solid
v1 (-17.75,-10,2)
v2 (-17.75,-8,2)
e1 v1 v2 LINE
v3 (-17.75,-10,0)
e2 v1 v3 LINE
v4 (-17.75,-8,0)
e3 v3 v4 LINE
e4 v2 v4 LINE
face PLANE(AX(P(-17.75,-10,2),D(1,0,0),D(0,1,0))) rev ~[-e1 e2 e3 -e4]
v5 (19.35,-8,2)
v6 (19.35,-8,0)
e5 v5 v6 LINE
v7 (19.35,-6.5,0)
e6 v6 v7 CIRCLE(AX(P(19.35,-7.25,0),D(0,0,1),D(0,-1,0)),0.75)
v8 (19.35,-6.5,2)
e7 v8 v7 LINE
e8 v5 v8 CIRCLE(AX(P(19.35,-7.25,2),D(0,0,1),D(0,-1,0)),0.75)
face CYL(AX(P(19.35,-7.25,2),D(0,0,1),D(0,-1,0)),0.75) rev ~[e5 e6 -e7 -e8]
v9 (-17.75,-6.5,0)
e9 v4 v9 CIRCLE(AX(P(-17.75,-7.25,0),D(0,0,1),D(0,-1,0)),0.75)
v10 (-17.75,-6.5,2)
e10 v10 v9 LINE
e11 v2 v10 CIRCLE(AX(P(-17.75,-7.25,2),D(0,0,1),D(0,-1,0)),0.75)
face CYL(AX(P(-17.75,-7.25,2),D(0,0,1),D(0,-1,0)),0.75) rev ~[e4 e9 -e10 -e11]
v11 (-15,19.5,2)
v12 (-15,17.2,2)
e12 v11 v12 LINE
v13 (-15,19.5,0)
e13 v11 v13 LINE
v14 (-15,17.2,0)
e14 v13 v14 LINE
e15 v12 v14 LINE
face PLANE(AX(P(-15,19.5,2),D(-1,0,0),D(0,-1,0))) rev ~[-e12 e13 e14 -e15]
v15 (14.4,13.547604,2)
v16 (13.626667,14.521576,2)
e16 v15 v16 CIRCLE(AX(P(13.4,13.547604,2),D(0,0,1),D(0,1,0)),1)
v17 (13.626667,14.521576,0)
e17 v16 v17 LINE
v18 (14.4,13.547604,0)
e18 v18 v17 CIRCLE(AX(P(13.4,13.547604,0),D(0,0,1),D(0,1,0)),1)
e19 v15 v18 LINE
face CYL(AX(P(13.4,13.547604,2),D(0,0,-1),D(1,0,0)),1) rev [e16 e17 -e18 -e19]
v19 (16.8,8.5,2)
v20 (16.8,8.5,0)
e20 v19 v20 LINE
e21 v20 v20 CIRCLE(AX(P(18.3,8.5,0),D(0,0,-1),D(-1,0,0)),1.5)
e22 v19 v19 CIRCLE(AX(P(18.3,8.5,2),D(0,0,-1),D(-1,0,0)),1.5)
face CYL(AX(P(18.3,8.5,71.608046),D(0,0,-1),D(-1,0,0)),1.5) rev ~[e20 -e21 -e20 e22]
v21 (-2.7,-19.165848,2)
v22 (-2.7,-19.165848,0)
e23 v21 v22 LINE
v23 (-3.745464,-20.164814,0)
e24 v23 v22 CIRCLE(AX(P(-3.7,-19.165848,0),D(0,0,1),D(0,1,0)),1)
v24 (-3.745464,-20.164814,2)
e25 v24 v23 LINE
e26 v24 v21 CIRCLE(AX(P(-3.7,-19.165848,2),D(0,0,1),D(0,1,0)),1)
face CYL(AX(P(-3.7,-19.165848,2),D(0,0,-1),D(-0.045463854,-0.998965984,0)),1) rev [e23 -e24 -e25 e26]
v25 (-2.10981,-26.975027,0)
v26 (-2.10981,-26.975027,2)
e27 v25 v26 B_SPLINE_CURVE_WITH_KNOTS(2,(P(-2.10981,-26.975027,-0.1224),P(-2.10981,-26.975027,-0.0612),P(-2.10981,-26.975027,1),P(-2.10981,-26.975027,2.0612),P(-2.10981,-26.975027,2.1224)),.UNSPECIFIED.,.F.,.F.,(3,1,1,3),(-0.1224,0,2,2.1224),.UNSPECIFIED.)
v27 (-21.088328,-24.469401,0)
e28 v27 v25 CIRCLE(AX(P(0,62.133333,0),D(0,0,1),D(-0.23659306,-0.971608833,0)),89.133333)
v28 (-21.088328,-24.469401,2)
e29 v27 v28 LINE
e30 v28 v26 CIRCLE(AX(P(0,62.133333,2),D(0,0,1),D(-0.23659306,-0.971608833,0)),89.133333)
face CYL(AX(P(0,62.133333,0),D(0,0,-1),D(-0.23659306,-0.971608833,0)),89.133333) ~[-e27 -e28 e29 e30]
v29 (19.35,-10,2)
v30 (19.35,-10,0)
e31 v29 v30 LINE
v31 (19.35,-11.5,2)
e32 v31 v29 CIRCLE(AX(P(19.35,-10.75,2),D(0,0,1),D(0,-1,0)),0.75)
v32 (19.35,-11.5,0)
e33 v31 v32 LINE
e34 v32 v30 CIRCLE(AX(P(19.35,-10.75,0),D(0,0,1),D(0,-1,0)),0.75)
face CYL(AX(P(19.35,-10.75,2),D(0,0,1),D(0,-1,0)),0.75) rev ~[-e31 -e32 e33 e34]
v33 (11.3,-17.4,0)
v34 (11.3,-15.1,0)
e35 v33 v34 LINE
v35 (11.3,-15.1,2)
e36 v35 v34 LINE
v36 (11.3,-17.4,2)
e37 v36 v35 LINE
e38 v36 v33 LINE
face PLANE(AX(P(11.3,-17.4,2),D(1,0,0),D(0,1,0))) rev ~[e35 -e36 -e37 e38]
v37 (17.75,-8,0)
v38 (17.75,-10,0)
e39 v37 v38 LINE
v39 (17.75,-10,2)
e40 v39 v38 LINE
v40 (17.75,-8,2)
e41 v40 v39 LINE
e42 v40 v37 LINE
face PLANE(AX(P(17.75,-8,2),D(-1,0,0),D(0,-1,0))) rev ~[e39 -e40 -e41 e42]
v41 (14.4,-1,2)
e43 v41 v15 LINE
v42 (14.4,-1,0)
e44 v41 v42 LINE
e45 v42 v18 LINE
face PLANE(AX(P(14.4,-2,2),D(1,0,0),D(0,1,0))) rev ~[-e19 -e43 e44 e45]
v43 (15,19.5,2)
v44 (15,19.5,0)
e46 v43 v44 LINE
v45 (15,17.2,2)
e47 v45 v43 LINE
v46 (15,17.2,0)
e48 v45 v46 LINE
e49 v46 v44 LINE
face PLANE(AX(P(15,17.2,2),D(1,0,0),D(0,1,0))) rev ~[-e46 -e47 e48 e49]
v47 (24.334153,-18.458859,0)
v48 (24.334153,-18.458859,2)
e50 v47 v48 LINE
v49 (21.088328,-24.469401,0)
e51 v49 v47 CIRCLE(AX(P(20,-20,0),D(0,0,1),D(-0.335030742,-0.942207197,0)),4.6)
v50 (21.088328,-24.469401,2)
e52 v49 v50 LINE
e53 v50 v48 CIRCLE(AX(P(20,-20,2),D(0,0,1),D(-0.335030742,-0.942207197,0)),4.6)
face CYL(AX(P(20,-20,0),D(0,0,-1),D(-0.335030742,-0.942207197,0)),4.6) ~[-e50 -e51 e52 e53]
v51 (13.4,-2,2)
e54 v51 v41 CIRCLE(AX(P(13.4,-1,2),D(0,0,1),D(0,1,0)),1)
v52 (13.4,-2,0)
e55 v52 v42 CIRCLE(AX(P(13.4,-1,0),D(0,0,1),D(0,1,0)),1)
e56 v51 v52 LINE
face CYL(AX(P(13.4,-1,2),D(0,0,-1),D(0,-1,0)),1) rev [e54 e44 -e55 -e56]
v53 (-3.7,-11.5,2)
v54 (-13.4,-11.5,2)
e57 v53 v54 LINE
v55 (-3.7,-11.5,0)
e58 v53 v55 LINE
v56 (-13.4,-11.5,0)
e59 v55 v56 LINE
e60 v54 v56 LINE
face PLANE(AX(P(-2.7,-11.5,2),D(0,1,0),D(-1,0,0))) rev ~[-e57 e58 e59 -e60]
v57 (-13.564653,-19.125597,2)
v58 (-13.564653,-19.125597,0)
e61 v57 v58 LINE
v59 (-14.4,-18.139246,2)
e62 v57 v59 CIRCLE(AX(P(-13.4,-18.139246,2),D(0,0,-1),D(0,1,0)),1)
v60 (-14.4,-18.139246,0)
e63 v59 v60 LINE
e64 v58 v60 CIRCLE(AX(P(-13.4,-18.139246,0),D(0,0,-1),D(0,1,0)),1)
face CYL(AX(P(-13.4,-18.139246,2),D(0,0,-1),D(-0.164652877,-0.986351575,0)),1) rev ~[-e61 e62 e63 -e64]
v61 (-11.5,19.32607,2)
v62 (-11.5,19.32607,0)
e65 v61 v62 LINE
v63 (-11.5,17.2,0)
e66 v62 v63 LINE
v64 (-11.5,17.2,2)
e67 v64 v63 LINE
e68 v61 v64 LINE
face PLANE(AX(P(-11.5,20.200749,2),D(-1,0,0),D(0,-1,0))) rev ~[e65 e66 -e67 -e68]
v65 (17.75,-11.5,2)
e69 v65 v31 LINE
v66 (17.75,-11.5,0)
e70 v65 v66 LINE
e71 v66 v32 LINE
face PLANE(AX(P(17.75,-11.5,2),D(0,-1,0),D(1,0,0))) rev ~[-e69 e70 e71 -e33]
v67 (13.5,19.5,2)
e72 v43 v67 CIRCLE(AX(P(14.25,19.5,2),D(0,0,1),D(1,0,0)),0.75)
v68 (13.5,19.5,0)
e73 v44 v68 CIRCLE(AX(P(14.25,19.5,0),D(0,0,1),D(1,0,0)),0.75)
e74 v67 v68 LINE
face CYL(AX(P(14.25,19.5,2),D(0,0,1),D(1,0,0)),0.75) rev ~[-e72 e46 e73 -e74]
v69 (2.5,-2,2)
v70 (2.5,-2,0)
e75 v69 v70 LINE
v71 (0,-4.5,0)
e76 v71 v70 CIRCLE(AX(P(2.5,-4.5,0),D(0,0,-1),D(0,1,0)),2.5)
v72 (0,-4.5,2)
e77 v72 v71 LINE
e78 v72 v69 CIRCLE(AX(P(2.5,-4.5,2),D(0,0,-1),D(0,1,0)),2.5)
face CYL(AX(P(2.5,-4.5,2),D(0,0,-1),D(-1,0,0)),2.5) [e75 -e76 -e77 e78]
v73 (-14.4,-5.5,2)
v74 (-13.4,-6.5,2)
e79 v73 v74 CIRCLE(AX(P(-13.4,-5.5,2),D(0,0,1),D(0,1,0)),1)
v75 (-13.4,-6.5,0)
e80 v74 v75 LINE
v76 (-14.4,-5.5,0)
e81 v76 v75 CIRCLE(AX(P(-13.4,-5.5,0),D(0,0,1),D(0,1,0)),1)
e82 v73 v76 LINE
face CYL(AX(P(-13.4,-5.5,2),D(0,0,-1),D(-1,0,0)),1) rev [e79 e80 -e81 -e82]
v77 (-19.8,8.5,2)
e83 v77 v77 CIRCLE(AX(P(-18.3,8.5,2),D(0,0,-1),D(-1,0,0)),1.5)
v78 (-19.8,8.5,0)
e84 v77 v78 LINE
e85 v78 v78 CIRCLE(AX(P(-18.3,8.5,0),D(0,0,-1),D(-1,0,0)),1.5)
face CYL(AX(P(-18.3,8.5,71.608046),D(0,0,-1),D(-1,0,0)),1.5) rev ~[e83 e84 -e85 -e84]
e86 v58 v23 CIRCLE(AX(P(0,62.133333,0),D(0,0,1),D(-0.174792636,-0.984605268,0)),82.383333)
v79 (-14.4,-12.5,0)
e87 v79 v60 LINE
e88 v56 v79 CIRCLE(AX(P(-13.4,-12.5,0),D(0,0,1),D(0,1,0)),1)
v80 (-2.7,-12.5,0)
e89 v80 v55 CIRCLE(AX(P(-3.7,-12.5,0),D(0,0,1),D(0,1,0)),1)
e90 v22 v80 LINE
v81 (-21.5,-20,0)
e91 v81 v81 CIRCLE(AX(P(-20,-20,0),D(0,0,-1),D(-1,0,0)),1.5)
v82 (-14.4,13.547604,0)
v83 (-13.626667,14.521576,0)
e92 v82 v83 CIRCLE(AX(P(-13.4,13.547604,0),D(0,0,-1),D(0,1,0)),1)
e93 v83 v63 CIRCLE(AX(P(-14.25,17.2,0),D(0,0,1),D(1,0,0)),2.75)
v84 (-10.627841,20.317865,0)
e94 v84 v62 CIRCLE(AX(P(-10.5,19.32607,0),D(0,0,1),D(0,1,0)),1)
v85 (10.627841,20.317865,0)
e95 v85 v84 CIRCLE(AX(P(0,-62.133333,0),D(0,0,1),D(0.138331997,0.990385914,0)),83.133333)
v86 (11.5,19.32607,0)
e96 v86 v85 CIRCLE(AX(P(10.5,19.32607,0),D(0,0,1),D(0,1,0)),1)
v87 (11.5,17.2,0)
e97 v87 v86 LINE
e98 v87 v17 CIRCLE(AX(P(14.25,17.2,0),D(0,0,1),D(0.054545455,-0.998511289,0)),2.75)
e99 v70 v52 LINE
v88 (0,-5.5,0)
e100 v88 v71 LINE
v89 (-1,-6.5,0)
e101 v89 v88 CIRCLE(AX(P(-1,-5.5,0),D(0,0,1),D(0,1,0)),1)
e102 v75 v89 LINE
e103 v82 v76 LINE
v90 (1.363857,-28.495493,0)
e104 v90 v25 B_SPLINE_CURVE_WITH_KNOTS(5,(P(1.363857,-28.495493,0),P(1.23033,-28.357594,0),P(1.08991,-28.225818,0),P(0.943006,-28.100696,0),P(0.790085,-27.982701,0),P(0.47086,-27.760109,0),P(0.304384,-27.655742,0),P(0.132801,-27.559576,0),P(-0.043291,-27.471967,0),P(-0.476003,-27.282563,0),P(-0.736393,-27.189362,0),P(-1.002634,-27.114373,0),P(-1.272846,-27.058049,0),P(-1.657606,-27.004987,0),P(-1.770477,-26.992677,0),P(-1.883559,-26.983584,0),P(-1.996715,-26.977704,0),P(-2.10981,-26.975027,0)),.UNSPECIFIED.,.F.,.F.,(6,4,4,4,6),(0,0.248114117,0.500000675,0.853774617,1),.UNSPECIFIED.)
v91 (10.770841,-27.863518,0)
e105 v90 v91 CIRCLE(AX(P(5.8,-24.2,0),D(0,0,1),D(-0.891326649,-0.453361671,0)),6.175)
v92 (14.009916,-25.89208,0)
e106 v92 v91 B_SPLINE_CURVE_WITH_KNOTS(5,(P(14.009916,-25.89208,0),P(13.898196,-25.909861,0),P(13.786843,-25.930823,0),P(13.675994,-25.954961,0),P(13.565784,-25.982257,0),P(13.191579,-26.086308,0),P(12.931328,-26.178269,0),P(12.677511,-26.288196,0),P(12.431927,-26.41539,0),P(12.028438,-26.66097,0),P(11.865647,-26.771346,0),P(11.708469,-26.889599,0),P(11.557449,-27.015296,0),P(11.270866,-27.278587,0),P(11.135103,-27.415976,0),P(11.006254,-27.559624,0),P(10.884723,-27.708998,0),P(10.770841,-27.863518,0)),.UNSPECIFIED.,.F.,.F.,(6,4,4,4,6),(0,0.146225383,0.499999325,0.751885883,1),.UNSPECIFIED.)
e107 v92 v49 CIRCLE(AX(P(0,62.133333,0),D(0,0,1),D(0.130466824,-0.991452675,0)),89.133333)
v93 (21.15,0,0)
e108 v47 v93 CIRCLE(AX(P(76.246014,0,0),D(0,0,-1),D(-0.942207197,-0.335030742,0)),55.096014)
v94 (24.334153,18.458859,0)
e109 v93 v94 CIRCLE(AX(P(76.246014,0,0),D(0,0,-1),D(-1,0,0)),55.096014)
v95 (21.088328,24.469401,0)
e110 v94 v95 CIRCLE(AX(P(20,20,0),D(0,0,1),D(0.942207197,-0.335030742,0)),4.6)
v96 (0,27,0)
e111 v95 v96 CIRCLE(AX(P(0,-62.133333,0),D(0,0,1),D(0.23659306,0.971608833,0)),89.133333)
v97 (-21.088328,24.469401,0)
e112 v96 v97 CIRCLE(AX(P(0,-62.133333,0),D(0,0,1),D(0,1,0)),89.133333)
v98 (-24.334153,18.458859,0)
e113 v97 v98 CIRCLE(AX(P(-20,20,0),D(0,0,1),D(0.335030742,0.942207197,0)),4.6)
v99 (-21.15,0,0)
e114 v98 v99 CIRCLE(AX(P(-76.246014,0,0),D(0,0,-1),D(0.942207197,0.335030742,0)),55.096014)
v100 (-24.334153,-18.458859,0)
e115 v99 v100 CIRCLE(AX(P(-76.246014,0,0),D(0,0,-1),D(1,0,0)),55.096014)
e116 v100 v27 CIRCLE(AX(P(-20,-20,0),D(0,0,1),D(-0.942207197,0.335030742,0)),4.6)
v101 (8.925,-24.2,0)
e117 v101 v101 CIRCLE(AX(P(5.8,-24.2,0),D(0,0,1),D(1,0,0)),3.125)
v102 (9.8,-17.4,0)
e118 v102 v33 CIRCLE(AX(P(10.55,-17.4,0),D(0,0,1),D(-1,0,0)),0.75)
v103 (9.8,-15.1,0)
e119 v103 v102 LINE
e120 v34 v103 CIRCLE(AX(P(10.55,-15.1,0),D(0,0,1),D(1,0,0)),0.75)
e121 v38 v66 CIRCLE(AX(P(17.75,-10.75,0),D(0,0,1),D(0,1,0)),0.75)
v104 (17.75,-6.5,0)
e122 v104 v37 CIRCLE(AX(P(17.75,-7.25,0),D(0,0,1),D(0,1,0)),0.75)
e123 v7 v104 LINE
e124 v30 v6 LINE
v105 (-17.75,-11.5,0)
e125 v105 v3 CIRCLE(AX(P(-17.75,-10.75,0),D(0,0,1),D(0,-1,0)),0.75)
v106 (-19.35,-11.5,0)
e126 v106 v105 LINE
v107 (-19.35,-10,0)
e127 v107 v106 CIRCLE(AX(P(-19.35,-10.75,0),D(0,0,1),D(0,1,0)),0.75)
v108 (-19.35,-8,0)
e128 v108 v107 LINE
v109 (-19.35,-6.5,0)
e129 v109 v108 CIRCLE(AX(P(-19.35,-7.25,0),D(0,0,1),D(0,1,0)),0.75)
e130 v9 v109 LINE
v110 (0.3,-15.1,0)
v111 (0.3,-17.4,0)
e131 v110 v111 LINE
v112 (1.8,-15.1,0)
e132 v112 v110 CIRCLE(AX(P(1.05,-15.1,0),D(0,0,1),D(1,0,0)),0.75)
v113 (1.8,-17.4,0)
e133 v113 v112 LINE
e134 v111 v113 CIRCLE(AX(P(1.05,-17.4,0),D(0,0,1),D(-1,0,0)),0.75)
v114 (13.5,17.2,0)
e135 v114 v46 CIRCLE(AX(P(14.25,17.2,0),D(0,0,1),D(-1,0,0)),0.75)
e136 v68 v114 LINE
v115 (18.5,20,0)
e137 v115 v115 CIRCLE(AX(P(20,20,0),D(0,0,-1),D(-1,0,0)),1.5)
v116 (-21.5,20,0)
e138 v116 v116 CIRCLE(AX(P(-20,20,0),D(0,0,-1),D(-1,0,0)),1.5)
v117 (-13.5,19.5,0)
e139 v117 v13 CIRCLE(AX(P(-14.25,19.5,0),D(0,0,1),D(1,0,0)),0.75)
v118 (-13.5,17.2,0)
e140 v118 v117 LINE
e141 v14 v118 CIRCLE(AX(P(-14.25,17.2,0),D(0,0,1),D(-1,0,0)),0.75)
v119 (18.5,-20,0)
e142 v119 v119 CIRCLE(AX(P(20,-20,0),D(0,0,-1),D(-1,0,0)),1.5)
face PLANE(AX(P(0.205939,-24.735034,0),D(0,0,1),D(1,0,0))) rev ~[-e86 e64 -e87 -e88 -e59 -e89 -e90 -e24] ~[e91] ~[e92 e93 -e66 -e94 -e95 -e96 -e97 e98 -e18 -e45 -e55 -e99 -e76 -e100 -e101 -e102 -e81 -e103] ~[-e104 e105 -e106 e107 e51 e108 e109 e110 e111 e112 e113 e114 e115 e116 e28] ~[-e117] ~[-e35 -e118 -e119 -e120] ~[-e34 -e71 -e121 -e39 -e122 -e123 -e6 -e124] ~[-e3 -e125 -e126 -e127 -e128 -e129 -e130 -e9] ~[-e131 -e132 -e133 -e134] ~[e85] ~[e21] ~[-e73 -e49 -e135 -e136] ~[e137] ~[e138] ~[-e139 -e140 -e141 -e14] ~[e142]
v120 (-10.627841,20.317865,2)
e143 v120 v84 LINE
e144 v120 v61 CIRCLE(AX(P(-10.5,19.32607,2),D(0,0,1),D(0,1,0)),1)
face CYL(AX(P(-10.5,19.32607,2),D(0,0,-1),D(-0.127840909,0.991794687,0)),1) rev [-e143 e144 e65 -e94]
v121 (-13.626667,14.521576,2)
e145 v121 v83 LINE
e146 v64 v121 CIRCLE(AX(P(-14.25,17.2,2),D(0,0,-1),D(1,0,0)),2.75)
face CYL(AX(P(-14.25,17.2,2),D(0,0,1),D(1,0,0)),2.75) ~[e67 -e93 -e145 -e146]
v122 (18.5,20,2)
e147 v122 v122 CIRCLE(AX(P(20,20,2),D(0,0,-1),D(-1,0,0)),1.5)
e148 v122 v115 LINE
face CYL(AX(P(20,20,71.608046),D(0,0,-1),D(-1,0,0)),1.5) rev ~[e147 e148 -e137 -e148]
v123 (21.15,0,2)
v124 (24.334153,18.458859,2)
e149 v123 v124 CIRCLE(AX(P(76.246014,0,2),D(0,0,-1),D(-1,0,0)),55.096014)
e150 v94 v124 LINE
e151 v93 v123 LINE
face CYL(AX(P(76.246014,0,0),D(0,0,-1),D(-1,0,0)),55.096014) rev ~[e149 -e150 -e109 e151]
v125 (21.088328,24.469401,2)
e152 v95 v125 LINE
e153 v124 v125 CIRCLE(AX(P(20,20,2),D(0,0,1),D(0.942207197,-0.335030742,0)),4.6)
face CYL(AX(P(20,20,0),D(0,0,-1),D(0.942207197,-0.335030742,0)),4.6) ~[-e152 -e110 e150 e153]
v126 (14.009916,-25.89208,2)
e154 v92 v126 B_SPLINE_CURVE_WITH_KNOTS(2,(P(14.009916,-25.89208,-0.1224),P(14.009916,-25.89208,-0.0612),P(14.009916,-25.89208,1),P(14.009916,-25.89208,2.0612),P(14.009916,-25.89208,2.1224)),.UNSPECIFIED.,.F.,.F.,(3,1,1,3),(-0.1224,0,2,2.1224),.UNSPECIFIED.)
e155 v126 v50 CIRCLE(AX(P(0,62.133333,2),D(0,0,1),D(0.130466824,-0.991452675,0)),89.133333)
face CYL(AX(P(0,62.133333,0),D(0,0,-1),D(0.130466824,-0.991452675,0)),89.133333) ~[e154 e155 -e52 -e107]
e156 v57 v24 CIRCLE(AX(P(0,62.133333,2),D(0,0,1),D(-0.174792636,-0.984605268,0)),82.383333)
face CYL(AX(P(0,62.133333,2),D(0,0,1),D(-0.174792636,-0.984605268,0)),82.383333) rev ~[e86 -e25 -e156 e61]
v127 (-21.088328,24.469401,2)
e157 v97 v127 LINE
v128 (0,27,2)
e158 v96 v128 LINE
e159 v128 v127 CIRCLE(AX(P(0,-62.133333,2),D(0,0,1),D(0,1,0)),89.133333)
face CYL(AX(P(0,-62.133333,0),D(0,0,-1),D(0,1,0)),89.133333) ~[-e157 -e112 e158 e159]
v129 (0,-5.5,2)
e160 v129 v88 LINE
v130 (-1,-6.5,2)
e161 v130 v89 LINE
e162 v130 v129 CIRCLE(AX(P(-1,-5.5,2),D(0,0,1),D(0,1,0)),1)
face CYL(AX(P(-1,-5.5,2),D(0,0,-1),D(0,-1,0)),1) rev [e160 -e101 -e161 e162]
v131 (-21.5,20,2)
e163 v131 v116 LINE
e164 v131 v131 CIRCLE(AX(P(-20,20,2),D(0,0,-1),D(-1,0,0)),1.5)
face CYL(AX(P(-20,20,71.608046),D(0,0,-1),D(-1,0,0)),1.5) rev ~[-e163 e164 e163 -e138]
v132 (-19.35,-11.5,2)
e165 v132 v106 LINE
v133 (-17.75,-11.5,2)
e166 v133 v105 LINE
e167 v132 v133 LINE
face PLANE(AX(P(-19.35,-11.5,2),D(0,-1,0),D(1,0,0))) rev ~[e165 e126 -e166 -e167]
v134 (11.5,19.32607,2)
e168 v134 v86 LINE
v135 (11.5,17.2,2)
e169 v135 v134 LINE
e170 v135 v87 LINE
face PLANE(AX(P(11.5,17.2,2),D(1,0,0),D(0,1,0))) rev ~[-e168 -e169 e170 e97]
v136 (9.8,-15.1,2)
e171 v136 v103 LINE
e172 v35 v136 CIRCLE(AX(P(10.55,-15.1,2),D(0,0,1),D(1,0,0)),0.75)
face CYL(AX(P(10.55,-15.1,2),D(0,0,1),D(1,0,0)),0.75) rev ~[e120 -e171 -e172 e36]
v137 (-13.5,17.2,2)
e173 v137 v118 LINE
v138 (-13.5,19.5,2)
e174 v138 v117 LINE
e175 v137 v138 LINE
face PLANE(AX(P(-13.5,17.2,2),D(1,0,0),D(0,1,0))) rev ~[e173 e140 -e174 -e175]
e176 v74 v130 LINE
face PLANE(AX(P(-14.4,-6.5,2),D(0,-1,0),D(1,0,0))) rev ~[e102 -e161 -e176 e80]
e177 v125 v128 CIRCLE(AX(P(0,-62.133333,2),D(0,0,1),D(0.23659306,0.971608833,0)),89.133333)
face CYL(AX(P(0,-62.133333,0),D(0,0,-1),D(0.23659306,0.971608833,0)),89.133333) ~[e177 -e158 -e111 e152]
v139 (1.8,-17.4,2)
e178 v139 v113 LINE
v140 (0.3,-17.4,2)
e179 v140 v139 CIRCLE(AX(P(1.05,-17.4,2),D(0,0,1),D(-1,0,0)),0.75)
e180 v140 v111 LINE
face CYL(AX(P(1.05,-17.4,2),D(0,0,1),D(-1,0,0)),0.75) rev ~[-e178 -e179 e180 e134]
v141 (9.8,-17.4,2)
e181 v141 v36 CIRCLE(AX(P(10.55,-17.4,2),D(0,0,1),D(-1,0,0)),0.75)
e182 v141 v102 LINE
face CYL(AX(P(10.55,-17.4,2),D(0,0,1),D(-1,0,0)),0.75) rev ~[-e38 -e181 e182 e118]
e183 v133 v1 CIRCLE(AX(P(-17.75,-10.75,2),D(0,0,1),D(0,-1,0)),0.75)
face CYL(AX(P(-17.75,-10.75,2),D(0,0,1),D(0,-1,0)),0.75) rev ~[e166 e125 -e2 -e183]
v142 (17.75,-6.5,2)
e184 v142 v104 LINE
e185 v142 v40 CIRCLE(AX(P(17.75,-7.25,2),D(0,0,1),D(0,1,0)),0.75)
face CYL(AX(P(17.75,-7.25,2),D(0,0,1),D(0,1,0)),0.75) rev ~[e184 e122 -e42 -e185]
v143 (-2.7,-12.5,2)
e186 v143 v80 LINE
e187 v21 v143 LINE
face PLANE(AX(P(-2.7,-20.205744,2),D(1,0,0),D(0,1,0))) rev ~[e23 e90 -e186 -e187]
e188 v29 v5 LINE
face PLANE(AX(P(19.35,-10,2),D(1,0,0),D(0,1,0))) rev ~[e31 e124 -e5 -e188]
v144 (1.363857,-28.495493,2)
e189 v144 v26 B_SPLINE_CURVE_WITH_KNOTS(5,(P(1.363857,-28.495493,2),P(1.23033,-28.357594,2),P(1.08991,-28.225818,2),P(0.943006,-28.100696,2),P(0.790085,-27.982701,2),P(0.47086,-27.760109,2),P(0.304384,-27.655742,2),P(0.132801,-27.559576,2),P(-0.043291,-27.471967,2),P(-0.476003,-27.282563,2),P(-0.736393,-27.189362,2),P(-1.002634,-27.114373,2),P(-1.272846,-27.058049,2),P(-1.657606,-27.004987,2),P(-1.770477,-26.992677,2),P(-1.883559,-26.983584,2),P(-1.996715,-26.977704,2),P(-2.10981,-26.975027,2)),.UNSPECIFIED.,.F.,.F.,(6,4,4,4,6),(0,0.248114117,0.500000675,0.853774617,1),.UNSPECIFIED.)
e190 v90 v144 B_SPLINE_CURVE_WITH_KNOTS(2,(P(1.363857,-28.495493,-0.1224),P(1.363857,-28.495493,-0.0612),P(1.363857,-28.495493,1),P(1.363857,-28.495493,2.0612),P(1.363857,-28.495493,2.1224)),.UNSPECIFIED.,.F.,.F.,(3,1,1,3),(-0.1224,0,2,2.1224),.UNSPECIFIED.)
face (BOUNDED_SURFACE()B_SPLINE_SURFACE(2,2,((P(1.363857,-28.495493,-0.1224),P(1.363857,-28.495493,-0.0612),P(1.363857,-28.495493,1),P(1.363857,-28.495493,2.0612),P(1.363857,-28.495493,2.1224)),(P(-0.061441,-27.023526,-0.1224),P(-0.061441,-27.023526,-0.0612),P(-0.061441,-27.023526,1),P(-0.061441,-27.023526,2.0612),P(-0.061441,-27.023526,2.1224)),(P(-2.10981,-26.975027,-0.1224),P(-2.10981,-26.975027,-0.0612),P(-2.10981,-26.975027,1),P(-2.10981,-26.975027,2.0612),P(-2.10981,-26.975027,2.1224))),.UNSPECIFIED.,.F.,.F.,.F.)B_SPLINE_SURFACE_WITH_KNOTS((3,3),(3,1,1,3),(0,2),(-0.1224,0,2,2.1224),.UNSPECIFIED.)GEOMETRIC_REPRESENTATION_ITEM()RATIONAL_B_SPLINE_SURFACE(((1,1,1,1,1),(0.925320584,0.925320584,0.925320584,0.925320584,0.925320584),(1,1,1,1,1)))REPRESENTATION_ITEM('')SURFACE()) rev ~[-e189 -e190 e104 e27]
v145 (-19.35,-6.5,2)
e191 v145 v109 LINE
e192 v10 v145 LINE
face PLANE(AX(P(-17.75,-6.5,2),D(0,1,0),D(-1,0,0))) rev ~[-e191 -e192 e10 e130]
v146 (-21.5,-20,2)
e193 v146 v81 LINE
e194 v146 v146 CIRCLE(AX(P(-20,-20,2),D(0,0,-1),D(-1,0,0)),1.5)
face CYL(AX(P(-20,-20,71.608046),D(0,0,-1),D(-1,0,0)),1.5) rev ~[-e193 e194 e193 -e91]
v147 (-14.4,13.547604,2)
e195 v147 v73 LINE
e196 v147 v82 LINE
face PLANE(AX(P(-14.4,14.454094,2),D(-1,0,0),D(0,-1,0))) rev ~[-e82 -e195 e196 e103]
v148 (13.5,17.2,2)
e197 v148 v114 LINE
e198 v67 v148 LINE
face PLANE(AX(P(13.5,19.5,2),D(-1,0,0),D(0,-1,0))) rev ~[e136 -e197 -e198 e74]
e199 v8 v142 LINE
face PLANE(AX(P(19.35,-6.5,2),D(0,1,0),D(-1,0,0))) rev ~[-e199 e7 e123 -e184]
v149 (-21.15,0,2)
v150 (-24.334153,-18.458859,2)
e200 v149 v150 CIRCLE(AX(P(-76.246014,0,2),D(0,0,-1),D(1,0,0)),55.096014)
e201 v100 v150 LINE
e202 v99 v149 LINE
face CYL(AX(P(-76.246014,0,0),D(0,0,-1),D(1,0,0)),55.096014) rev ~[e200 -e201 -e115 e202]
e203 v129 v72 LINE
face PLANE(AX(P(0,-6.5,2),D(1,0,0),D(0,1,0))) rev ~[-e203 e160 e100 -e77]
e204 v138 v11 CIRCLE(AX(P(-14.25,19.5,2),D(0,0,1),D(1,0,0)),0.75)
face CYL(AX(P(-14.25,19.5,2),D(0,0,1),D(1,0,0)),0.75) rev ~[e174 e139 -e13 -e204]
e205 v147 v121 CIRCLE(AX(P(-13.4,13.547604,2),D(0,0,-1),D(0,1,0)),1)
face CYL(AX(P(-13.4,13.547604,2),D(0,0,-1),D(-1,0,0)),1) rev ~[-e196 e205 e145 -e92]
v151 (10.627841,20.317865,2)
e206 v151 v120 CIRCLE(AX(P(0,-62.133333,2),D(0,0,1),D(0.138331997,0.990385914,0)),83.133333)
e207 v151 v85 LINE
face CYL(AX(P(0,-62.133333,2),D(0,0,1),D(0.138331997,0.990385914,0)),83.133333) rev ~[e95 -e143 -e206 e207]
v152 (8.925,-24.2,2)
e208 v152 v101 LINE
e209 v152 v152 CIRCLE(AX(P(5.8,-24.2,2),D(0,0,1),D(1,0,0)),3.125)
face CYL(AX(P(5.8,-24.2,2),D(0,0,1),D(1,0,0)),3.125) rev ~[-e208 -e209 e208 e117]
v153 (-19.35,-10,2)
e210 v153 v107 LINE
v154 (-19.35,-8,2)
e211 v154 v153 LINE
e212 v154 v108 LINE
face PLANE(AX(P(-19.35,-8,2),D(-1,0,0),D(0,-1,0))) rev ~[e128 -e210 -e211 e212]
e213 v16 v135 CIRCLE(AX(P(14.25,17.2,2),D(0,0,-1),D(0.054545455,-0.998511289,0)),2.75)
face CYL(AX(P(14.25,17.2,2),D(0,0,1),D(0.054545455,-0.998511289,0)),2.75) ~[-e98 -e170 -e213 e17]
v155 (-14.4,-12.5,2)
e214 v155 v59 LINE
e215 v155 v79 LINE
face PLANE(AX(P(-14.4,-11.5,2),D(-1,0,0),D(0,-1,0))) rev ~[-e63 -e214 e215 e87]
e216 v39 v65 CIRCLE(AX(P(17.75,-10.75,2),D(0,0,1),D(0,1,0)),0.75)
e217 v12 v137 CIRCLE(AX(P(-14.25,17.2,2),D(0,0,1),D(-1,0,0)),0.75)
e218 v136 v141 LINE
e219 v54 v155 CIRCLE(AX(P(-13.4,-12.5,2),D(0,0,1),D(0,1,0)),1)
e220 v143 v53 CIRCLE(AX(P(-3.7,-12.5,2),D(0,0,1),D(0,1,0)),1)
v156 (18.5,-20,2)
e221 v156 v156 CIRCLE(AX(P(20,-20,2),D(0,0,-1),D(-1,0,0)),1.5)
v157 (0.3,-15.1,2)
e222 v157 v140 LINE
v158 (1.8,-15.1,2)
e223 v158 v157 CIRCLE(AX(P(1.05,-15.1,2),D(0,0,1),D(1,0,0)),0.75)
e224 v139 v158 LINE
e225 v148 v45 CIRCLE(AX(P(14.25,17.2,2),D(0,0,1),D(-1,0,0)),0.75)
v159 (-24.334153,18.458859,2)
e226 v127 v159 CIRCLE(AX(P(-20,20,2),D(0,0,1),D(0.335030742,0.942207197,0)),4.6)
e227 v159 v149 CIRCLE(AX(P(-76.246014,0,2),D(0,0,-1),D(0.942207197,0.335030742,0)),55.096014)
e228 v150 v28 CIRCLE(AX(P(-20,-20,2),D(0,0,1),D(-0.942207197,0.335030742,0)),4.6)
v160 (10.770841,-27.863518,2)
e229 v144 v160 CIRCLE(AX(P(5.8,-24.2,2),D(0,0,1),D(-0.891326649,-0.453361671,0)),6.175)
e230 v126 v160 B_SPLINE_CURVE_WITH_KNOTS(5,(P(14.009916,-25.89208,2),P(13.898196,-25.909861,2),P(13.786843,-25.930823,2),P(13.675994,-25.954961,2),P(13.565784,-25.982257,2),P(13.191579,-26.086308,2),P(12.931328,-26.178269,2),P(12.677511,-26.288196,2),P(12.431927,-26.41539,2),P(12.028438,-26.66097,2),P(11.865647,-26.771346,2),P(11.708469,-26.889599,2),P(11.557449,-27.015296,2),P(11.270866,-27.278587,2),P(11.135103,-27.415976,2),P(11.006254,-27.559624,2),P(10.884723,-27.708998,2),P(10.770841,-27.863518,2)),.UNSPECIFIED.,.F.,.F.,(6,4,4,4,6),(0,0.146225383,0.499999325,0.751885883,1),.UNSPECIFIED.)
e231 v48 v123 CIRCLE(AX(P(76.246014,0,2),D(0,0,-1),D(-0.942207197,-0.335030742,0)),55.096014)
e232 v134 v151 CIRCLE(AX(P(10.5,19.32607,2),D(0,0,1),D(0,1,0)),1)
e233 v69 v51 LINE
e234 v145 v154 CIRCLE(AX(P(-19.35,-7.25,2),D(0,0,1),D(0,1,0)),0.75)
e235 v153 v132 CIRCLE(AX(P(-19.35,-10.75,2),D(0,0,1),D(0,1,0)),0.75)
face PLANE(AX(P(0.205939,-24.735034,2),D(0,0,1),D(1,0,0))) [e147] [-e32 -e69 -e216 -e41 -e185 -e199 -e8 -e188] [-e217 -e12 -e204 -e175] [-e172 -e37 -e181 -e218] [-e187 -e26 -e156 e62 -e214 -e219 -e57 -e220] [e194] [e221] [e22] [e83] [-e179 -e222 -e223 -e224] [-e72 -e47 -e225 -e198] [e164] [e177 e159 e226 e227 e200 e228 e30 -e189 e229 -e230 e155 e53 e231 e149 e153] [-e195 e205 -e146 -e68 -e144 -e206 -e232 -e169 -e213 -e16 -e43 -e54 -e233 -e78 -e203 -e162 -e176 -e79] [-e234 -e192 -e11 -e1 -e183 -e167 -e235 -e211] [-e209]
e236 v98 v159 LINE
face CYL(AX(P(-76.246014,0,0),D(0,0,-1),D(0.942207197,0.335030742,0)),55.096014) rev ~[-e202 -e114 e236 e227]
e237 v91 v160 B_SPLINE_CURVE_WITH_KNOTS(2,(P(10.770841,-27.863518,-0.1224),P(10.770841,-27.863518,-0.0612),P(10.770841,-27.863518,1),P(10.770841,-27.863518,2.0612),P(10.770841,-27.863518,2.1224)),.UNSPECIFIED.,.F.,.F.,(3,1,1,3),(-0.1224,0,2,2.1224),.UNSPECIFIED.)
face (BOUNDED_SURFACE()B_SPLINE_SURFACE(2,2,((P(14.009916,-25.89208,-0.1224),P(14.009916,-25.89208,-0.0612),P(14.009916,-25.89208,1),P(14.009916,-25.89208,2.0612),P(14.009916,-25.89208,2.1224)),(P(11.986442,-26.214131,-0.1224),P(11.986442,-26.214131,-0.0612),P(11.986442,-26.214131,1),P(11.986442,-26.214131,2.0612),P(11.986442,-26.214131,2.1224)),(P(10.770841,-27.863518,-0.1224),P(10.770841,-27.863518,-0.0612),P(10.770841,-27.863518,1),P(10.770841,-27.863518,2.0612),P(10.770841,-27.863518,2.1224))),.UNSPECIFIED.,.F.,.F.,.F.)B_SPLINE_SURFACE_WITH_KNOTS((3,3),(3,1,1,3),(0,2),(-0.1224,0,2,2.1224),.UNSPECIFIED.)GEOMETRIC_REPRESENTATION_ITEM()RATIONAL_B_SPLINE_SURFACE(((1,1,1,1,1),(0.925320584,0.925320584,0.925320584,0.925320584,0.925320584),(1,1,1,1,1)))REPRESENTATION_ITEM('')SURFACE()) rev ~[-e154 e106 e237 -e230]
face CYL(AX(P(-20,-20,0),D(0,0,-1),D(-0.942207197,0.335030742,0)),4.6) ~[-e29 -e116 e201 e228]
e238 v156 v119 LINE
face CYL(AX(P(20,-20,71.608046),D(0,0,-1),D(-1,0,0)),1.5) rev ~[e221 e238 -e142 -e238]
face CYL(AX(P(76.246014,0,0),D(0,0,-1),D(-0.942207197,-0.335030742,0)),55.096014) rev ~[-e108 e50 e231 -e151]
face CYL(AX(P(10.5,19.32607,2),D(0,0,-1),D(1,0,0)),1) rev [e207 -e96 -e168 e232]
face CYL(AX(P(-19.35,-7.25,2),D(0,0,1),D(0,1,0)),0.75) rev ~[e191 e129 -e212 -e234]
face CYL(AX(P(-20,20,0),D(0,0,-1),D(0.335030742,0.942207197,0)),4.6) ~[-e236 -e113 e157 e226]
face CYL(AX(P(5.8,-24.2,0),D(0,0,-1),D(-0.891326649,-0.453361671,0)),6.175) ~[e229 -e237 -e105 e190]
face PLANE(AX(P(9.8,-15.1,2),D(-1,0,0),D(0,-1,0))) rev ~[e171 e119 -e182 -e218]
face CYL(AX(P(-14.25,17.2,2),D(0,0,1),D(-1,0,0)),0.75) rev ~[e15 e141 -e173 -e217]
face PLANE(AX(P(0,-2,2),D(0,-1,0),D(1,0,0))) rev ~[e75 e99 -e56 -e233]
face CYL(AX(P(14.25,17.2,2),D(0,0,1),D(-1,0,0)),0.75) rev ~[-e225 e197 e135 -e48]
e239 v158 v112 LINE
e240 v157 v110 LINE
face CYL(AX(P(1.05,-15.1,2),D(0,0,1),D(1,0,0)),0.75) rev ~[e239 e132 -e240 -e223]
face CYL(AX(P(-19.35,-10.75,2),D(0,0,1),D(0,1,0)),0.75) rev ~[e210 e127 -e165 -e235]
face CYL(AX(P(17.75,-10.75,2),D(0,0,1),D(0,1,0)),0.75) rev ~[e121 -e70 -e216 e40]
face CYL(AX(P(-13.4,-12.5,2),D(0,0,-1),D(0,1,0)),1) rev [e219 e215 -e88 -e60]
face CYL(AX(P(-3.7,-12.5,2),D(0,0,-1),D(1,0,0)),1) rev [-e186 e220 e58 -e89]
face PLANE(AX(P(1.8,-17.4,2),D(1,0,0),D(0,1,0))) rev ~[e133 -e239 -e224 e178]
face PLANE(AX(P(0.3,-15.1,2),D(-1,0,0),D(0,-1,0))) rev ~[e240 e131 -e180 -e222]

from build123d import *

# Parameters (mm, degrees)
F1_DEPTH  = 2
F3_DEPTH  = 2.001
F5_D      = 3
F8_DEPTH  = 2
F10_DEPTH = 2
F11_R     = 5
F13_DEPTH = 2.0010001
F14_R     = 3.125
F15_DEPTH = 2.0010001
F17_DEPTH = 2.0010001
F18_R     = 1
F19_R     = 2.5


# Not quite as in the source:
# - a feature names something its author has since deleted; it is built from what else it names


with BuildPart() as f1:
    # F0 (on Top) → F1 (new body)
    with BuildSketch(Plane.XY):
        with BuildLine():
            ThreePointArc((-18.4588585891, 24.3341531066), (-23.2526911935, 23.2526911935), (-24.3341531066, 18.4588585891))
            ThreePointArc((-24.3341531066, 18.4588585891), (-21.9518735553, 9.3657393117), (-21.15, 0))
            ThreePointArc((-21.15, 0), (-21.9518735553, -9.3657393117), (-24.3341531066, -18.4588585891))
            ThreePointArc((-24.3341531066, -18.4588585891), (-23.2526911935, -23.2526911935), (-18.4588585891, -24.3341531066))
            ThreePointArc((-18.4588585891, -24.3341531066), (-9.3657393117, -21.9518735553), (0, -21.15))
            ThreePointArc((0, -21.15), (9.3657393117, -21.9518735553), (18.4588585891, -24.3341531066))
            ThreePointArc((18.4588585891, -24.3341531066), (23.2526911935, -23.2526911935), (24.3341531066, -18.4588585891))
            ThreePointArc((24.3341531066, -18.4588585891), (21.9518735553, -9.3657393117), (21.15, 0))
            ThreePointArc((21.15, 0), (21.9518735553, 9.3657393117), (24.3341531066, 18.4588585891))
            ThreePointArc((24.3341531066, 18.4588585891), (23.2526911935, 23.2526911935), (18.4588585891, 24.3341531066))
            ThreePointArc((18.4588585891, 24.3341531066), (9.3657393117, 21.9518735553), (0, 21.15))
            ThreePointArc((0, 21.15), (-9.3657393117, 21.9518735553), (-18.4588585891, 24.3341531066))
        make_face()
    extrude(amount=F1_DEPTH)

    # F2 (on face) → F3 (cut, through all)
    with BuildSketch(Plane.XY.offset(2)):
        with BuildLine():
            Line((-18.55, -6.5), (-19.35, -6.5))
            ThreePointArc((-19.35, -6.5), (-20.1, -7.25), (-19.35, -8))
            Line((-19.35, -8), (-19.35, -9))
            Line((-19.35, -9), (-19.35, -10))
            ThreePointArc((-19.35, -10), (-20.1, -10.75), (-19.35, -11.5))
            Line((-19.35, -11.5), (-18.55, -11.5))
            Line((-18.55, -11.5), (-17.75, -11.5))
            ThreePointArc((-17.75, -11.5), (-17, -10.75), (-17.75, -10))
            Line((-17.75, -10), (-17.75, -9))
            Line((-17.75, -9), (-17.75, -8))
            ThreePointArc((-17.75, -8), (-17, -7.25), (-17.75, -6.5))
            Line((-17.75, -6.5), (-18.55, -6.5))
        make_face()
        with BuildLine():
            Line((18.55, -11.5), (19.35, -11.5))
            ThreePointArc((19.35, -11.5), (20.1, -10.75), (19.35, -10))
            Line((19.35, -10), (19.35, -9))
            Line((19.35, -9), (19.35, -8))
            ThreePointArc((19.35, -8), (20.1, -7.25), (19.35, -6.5))
            Line((19.35, -6.5), (18.55, -6.5))
            Line((18.55, -6.5), (17.75, -6.5))
            ThreePointArc((17.75, -6.5), (17, -7.25), (17.75, -8))
            Line((17.75, -8), (17.75, -9))
            Line((17.75, -9), (17.75, -10))
            ThreePointArc((17.75, -10), (17, -10.75), (17.75, -11.5))
            Line((17.75, -11.5), (18.55, -11.5))
        make_face()
    extrude(amount=-F3_DEPTH, mode=Mode.SUBTRACT)

    # F5 (through all)
    with Locations(Plane.XY.offset(2)):
        with Locations((-18.3, 8.5), (-20, 20), (20, 20), (18.3, 8.5), (20, -20), (-20, -20)):
            Hole(F5_D / 2)

    # F7 (on Top) → F8 (join, through all)
    with BuildSketch(Plane.XY):
        with BuildLine():
            ThreePointArc((21.0883280757, 24.4694006309), (10.6198106645, 26.3650888705), (0, 27))
            ThreePointArc((0, 27), (-10.6198106645, 26.3650888705), (-21.0883280757, 24.4694006309))
            ThreePointArc((-21.0883280757, 24.4694006309), (-19.7637100249, 24.5939271922), (-18.4588585891, 24.3341531066))
            ThreePointArc((-18.4588585891, 24.3341531066), (-9.3657393117, 21.9518735553), (0, 21.15))
            ThreePointArc((0, 21.15), (9.3657393117, 21.9518735553), (18.4588585891, 24.3341531066))
            ThreePointArc((18.4588585891, 24.3341531066), (19.7637100249, 24.5939271922), (21.0883280757, 24.4694006309))
        make_face()
    extrude(amount=F8_DEPTH)

    # F9 (on Top) → F10 (join, through all)
    with BuildSketch(Plane.XY):
        with BuildLine():
            ThreePointArc((11.6289429392, -26.2381484763), (16.3825233985, -25.4815286377), (21.0883280757, -24.4694006309))
            ThreePointArc((21.0883280757, -24.4694006309), (19.7637100249, -24.5939271922), (18.4588585891, -24.3341531066))
            ThreePointArc((18.4588585891, -24.3341531066), (9.3657393117, -21.9518735553), (0, -21.15))
            ThreePointArc((0, -21.15), (-9.3657393117, -21.9518735553), (-18.4588585891, -24.3341531066))
            ThreePointArc((-18.4588585891, -24.3341531066), (-19.7637100249, -24.5939271922), (-21.0883280757, -24.4694006309))
            ThreePointArc((-21.0883280757, -24.4694006309), (-10.4728212797, -26.3826037941), (0.2960579419, -26.9995083178))
            ThreePointArc((0.2960579419, -26.9995083178), (6.2139125454, -30.3611120266), (11.6289429392, -26.2381484763))
        make_face()
    extrude(amount=F10_DEPTH)

    # F11
    f11_edges = [f1.edges().sort_by_distance(p)[0] for p in [
        (0.296058, -26.999508, 1),
        (11.628943, -26.238148, 1),
    ]]
    fillet(f11_edges, radius=F11_R)

    # F12 (on face) → F13 (cut, through all)
    with BuildSketch(Plane.XY.offset(2)):
        with BuildLine():
            ThreePointArc((11.3, -15.1), (10.55, -14.35), (9.8, -15.1))
            Line((9.8, -15.1), (9.8, -17.4))
            ThreePointArc((9.8, -17.4), (10.55, -18.15), (11.3, -17.4))
            Line((11.3, -17.4), (11.3, -15.1))
        make_face()
        with BuildLine():
            ThreePointArc((1.8, -15.1), (1.05, -14.35), (0.3, -15.1))
            Line((0.3, -15.1), (0.3, -17.4))
            ThreePointArc((0.3, -17.4), (1.05, -18.15), (1.8, -17.4))
            Line((1.8, -17.4), (1.8, -15.1))
        make_face()
        with BuildLine():
            ThreePointArc((15, 19.5), (14.25, 20.25), (13.5, 19.5))
            Line((13.5, 19.5), (13.5, 17.2))
            ThreePointArc((13.5, 17.2), (14.25, 16.45), (15, 17.2))
            Line((15, 17.2), (15, 19.5))
        make_face()
        with BuildLine():
            ThreePointArc((-13.5, 19.5), (-14.25, 20.25), (-15, 19.5))
            Line((-15, 19.5), (-15, 17.2))
            ThreePointArc((-15, 17.2), (-14.25, 16.45), (-13.5, 17.2))
            Line((-13.5, 17.2), (-13.5, 19.5))
        make_face()
    extrude(amount=-F13_DEPTH, mode=Mode.SUBTRACT)

    # F14 (on face) → F15 (cut, through all)
    with BuildSketch(Plane.XY.offset(2)):
        with Locations((5.8, -24.2)):
            Circle(F14_R)
    extrude(amount=-F15_DEPTH, mode=Mode.SUBTRACT)

    # F16 (on face) → F17 (cut, through all)
    with BuildSketch(Plane.XY.offset(2)):
        with BuildLine():
            ThreePointArc((-11.5, 17.2), (-12.3592329599, 15.2031274452), (-14.4, 14.4540939565))
            Line((-14.4, 14.4540939565), (-14.4, -6.5))
            Line((-14.4, -6.5), (0, -6.5))
            Line((0, -6.5), (0, -2))
            Line((0, -2), (14.4, -2))
            Line((14.4, -2), (14.4, 14.4540939565))
            ThreePointArc((14.4, 14.4540939565), (12.3592329599, 15.2031274452), (11.5, 17.2))
            Line((11.5, 17.2), (11.5, 20.2007489844))
            ThreePointArc((11.5, 20.2007489844), (0, 21), (-11.5, 20.2007489844))
            Line((-11.5, 20.2007489844), (-11.5, 17.2))
        make_face()
        with BuildLine():
            ThreePointArc((-14.4, -18.9817306875), (-8.5718756396, -19.8028403577), (-2.7, -20.2057437268))
            Line((-2.7, -20.2057437268), (-2.7, -11.5))
            Line((-2.7, -11.5), (-14.4, -11.5))
            Line((-14.4, -11.5), (-14.4, -18.9817306875))
        make_face()
    extrude(amount=-F17_DEPTH, mode=Mode.SUBTRACT)

    # F18
    f18_edges = [f1.edges().sort_by_distance(p)[0] for p in [
        (-2.7, -11.5, 1),
        (-14.4, -11.5, 1),
        (-14.4, -18.981731, 1),
        (-2.7, -20.205744, 1),
        (11.5, 20.200749, 1),
        (-11.5, 20.200749, 1),
        (-14.4, -6.5, 1),
        (14.4, -2, 1),
        (0, -6.5, 1),
        (-14.4, 14.454094, 1),
        (14.4, 14.454094, 1),
    ]]
    fillet(f18_edges, radius=F18_R)

    # F19
    f19_edges = [f1.edges().sort_by_distance(p)[0] for p in [
        (0, -2, 1),
    ]]
    fillet(f19_edges, radius=F19_R)


solid = f1.part
